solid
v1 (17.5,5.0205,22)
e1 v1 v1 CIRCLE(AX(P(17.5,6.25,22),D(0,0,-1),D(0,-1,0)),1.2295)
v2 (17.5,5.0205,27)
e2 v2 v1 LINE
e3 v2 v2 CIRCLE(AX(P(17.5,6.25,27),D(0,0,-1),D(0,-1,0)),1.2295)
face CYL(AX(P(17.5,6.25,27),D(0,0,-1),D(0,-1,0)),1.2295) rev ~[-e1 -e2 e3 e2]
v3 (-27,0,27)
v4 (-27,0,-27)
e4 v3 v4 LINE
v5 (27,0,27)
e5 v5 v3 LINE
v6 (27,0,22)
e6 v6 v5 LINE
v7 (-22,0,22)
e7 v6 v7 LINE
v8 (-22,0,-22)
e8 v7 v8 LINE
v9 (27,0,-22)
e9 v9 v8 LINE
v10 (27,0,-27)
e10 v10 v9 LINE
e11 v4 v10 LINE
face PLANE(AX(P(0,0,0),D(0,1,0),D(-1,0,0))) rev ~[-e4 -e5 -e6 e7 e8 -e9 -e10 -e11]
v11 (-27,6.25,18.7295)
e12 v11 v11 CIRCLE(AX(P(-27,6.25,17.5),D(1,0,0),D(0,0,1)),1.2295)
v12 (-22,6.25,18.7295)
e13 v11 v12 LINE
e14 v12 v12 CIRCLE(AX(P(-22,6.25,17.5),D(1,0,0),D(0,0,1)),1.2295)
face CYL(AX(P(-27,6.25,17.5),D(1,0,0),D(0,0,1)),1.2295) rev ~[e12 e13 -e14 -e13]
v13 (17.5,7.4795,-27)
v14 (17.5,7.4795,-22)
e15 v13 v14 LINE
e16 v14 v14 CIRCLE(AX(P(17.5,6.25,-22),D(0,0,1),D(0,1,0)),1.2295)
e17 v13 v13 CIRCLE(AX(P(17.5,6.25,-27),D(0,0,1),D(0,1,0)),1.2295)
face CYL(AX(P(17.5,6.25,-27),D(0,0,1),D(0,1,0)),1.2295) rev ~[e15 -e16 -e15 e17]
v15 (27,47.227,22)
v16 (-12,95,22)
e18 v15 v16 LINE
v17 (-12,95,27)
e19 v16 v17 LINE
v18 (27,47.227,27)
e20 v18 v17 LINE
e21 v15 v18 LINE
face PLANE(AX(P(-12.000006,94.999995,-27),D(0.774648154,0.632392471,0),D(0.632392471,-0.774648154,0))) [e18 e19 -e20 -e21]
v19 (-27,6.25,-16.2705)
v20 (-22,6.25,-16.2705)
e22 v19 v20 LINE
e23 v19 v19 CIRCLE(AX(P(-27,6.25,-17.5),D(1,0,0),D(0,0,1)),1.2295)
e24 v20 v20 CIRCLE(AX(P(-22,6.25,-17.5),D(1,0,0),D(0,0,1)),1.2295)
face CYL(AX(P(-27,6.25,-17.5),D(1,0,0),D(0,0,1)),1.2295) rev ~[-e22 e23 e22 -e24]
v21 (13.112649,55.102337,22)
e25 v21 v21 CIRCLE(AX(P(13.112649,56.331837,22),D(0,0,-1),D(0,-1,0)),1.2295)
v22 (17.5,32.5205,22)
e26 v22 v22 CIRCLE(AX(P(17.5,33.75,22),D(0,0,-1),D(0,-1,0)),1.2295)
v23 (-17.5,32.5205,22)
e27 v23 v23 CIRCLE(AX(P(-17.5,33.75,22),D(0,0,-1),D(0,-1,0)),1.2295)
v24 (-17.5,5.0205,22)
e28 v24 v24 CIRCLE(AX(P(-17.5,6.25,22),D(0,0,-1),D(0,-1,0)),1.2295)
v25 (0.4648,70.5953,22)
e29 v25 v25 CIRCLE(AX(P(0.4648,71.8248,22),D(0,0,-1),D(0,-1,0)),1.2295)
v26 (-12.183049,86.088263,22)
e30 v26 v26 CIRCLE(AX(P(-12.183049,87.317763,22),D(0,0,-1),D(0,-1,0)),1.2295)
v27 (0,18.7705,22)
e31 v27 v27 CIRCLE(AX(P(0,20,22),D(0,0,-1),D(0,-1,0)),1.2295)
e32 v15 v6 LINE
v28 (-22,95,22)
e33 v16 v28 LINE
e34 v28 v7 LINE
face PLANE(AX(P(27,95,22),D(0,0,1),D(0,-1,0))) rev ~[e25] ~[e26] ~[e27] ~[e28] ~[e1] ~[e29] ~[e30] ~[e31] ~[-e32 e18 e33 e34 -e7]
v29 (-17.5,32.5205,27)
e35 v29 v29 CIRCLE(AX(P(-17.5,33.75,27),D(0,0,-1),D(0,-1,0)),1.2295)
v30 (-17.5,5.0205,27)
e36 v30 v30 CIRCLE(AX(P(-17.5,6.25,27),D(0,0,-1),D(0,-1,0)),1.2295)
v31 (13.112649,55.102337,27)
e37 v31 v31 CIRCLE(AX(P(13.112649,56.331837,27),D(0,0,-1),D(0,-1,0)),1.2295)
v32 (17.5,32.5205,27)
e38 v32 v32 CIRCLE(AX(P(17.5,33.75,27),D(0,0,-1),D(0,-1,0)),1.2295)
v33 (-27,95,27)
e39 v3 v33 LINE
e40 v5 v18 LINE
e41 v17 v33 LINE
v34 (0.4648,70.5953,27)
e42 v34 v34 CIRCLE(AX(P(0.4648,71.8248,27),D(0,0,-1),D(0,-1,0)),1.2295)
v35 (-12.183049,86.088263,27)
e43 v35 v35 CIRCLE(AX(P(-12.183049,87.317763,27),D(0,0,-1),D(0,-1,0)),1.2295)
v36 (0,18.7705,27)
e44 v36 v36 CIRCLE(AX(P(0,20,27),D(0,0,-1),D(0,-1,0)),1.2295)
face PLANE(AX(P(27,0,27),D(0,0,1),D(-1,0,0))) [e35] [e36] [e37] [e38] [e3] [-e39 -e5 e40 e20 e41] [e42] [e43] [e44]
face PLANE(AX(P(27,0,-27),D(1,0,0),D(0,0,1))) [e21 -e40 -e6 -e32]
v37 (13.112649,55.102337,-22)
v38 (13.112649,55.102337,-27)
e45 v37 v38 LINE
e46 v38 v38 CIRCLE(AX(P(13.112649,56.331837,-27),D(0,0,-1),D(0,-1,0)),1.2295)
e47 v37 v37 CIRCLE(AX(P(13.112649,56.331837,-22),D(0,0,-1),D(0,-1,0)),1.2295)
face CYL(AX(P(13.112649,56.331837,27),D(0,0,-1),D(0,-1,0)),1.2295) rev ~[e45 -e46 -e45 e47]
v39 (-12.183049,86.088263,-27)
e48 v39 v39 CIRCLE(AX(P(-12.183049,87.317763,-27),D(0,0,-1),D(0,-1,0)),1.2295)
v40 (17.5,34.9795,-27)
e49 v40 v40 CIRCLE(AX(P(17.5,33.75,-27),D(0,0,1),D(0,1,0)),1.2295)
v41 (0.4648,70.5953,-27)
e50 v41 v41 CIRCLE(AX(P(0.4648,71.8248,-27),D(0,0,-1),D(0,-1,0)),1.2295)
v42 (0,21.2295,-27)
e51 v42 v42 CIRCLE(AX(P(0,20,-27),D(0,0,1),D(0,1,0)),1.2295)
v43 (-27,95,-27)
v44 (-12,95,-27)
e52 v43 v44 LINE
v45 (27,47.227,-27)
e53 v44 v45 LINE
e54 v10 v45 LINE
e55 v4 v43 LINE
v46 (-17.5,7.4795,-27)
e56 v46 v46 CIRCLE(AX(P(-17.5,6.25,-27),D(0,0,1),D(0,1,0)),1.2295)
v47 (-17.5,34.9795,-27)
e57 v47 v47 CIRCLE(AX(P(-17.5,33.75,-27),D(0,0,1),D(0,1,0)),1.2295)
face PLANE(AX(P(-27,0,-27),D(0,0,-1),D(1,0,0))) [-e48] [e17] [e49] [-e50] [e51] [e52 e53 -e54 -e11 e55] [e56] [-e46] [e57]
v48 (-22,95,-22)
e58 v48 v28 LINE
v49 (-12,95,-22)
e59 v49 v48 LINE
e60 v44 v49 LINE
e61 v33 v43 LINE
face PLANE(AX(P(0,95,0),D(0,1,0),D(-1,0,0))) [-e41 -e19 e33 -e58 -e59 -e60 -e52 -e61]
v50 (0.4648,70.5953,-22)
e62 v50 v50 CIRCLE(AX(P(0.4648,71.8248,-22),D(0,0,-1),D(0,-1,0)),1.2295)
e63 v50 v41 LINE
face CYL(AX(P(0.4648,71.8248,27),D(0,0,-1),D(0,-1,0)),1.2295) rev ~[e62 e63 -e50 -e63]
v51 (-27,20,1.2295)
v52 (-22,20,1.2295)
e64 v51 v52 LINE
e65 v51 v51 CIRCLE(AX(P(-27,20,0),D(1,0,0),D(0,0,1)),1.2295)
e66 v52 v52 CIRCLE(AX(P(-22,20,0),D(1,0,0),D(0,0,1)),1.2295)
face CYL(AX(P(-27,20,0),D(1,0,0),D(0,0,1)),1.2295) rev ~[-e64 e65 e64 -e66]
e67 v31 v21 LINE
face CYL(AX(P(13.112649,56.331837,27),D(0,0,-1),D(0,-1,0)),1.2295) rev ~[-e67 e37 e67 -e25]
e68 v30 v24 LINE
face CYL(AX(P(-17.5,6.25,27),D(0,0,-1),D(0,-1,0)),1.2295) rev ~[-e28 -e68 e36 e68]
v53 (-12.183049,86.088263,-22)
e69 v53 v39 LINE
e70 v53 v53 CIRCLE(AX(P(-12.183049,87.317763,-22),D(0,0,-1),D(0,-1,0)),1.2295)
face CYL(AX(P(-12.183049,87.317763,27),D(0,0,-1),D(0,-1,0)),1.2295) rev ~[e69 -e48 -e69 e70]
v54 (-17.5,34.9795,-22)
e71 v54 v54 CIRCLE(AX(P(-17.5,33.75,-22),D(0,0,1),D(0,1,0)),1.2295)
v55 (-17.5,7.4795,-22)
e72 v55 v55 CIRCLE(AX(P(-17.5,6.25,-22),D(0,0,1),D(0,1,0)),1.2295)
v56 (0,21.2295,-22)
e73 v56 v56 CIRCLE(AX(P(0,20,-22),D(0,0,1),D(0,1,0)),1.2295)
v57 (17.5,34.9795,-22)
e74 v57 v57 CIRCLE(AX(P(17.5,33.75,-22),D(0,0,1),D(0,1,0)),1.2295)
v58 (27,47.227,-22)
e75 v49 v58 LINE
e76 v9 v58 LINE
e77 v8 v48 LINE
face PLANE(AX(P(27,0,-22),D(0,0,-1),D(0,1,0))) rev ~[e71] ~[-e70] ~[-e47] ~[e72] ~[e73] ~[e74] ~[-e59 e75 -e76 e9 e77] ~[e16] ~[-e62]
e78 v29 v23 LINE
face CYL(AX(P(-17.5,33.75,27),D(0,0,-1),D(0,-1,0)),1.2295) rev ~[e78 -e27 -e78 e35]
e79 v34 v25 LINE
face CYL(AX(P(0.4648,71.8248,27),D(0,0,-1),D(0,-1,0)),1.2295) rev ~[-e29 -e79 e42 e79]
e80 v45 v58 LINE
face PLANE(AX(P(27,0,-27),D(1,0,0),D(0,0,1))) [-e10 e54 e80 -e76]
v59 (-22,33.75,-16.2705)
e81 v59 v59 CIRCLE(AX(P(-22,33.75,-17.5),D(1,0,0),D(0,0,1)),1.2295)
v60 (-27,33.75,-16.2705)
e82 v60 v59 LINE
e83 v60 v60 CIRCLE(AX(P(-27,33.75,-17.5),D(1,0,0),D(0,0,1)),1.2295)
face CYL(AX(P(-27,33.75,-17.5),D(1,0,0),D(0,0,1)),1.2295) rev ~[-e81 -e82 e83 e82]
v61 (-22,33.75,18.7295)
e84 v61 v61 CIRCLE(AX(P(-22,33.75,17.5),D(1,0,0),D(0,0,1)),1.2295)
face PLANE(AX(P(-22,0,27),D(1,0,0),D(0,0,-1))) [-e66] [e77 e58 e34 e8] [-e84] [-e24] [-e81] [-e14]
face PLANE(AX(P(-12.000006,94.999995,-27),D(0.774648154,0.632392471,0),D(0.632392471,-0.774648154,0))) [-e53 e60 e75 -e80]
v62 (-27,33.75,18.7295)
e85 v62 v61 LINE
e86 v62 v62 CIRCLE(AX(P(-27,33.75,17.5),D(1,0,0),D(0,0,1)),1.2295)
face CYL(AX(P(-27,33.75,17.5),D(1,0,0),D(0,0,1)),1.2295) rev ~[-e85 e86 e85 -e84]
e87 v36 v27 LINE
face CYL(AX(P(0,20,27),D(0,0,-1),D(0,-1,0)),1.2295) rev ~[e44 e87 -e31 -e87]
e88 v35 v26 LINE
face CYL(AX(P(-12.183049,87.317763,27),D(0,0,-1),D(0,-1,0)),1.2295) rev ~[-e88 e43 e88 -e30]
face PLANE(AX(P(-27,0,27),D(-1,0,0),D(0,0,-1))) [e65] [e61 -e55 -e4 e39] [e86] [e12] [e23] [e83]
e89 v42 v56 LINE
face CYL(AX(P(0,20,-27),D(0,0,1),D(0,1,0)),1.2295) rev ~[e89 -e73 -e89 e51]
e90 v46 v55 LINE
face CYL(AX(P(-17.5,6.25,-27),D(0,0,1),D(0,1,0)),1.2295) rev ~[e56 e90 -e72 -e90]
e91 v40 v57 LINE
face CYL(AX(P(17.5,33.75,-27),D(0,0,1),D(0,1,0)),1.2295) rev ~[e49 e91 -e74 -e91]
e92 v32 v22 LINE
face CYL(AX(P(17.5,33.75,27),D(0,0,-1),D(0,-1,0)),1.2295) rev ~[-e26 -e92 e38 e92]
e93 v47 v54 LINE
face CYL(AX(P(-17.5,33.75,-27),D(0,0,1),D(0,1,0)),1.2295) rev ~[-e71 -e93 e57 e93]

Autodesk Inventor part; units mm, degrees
ref_plane "YZ Plane" through (0, 0, 0) normal (1, 0, 0) x (0, 1, 0)
ref_plane "XZ Plane" through (0, 0, 0) normal (0, 1, 0) x (-1, 0, 0)
ref_plane "XY Plane" through (0, 0, 0) normal (0, 0, 1) x (1, 0, 0)
sketch "Skizze1" plane through (0, 0, 0) normal (0, 1, 0) x (-1, 0, 0)
  line L0 (-27, 27) -> (27, 27)
  line L1 (27, 27) -> (27, -27)
  line L2 (27, -27) -> (-27, -27)
  line L3 (-27, -27) -> (-27, 27)
  line L4 (-27, 27) -> (27, -27) construction
  line L5 (27, 27) -> (-27, -27) construction
  point P0 (0, 0)
  dimension "d0" = 54
  dimension "d1" = 54
extrude "Extrusion1" add sketch "Skizze1" along normal blind 95
sketch "Skizze2" plane through (27, 0, 27) normal (1, 0, 0) x (0, 0, -1)
  line L0 (5, 0) -> (49, 0)
  line L1 (49, 0) -> (49, 95)
  line L2 (49, 95) -> (5, 95)
  line L3 (5, 95) -> (5, 0)
  line L4 (0, 0) -> (0, 95) projected
  line L5 (54, 0) -> (54, 95) projected
  line L6 (54, 0) -> (0, 0) projected
  line L7 (54, 0) -> (54, 95) projected
  line L8 (0, 95) -> (54, 95) projected
  line L9 (0, 0) -> (0, 95) projected
  line L10 (0, 95) -> (54, 95) projected
  line L11 (54, 0) -> (0, 0) projected
  point P0 (27, 0)
  dimension "d4" = 5
  dimension "d5" = 5
extrude "Extrusion2" cut sketch "Skizze2" against normal blind 49 contours L3 L2 L1 L0
sketch "Skizze3" plane through (27, 0, -27) normal (0, 0, -1) x (-1, 0, 0)
  line L0 (54, 0) -> (0, 0) projected
  line L1 (54, 0) -> (54, 95) projected
  line L2 (0, 95) -> (54, 95) projected
  line L3 (0, 0) -> (0, 95) projected
  line L4 (61.4003, 122.4392) -> (0, 47.227)
  line L5 (0, 47.227) -> (39, 95)
  line L6 (39, 95) -> (33.5775, 99.4267) construction
  line L7 (33.5775, 99.4267) -> (-5.4225, 51.6538) construction
  line L8 (-5.4225, 51.6538) -> (0, 47.227) construction
  line L9 (31.8094, 54.61) -> (-25.1559, 101.1143) construction
  line L10 (27.9901, 92.5825) -> (-13.8409, 126.7317)
  line L11 (-13.8409, 126.7317) -> (-47.9901, 84.9007)
  line L12 (-47.9901, 84.9007) -> (-6.1591, 50.7515) construction
  line L13 (-6.1591, 50.7515) -> (27.9901, 92.5825) construction
  line L14 (27.9901, 92.5825) -> (-47.9901, 84.9007) construction
  line L15 (-13.8409, 126.7317) -> (-6.1591, 50.7515) construction
  line L16 (0, 95) -> (54, 95) projected
  point P0 (27, 0)
  point P1 (-10, 88.7416)
  point P2 (-10, 88.7416)
  dimension "d34" = 7
  dimension "d35" = 61.6706
  dimension "d36" = 25.8353
  dimension "d37" = 54
  dimension "d38" = 54
  dimension "d39" = 15
  dimension "d60" = 10
extrude "Extrusion3" cut sketch "Skizze3" against normal through all contours L3 L2 L4
sketch "Skizze4" plane through (27, 0, -27) normal (0, 0, -1) x (-1, 0, 0)
  line L0 (9.5, 6.25) -> (44.5, 6.25)
  line L1 (44.5, 6.25) -> (44.5, 33.75)
  line L2 (44.5, 33.75) -> (9.5, 33.75)
  line L3 (9.5, 33.75) -> (9.5, 6.25)
  line L4 (9.5, 6.25) -> (44.5, 33.75) construction
  line L5 (44.5, 6.25) -> (9.5, 33.75) construction
  line L6 (27, 0) -> (27, 60.1271) construction
  line L7 (54, 0) -> (0, 0) construction
  point P0 (27, 20)
  point P1 (27, 20)
  dimension "d11" = 35
  dimension "d12" = 27.5
  dimension "d62" = 20
hole "Bohrung1" at (17.5, 33.75, -27) at (-17.5, 33.75, -27) at (-17.5, 6.25, -27) at (0, 20, -27) at (17.5, 6.25, -27) direction (0, 0, 1) diameter 2.459 end up to surface thread size "M3x0.5" class "6H" standard "ISO Metric profile"
sketch "Skizze5" plane through (27, 47.227, -22) normal (0.7746482, 0.6323925, 0) x (0, 0, -1)
  line L0 (-49, 0) -> (-49, 61.6706) projected
  line L1 (-44, 0) -> (-49, 0) projected
  line L2 (-44, 61.6706) -> (-44, 0) projected
  line L3 (0, 61.6706) -> (5, 61.6706) projected
  line L4 (0, 0) -> (0, 61.6706) projected
  line L5 (5, 0) -> (0, 0) projected
  line L6 (5, 61.6706) -> (5, 0) projected
  line L7 (0, 61.6706) -> (5, 61.6706) projected
  line L8 (-49, 0) -> (-49, 61.6706) projected
  line L9 (-44, 0) -> (-49, 0) projected
  line L10 (-44, 61.6706) -> (-44, 0) projected
  line L11 (-49, 61.6706) -> (-44, 61.6706) projected
  line L12 (0, 0) -> (0, 61.6706) projected
  line L13 (5, 0) -> (0, 0) projected
  line L14 (5, 61.6706) -> (5, 0) projected
  line L15 (-49, 61.6706) -> (-44, 61.6706) projected
  point P0 (127.5861, 27)
  point P1 (-46.5, 55)
  point P2 (2.5, 55)
  dimension "d41" = 2.5
  dimension "d42" = 2.5
  dimension "d43" = 55
  dimension "d44" = 55
hole "Bohrung2" [suppressed]
pattern_linear "Rechteckige Anordnung1" [suppressed]
pattern_circular "Runde Anordnung1" count 3 over 180 about axis through (0, -10, 0) along (0, 1, 0) of "Bohrung1"
sketch "Skizze6" plane through (-27, 0, 27) normal (0, 0, 1) x (1, 0, 0)
  circle A0 centre (27, 20) radius 1.2295 projected
  circle A1 centre (9.5, 6.25) radius 1.2295 projected
  circle A2 centre (44.5, 6.25) radius 1.2295 projected
  circle A3 centre (9.5, 33.75) radius 1.2295 projected
  circle A4 centre (44.5, 33.75) radius 1.2295 projected
  line L0 (54, 47.227) -> (15, 95) projected
  line L1 (0, 95) -> (15, 95) projected
  line L2 (0, 0) -> (0, 95) projected
  line L3 (54, 0) -> (0, 0) projected
  line L4 (54, 0) -> (54, 47.227) projected
  line L5 (5, 95) -> (5, 0) construction
  line L6 (15, 95) -> (-19.3701, 66.9416) construction
  line L7 (54, 47.227) -> (15, 95) construction
  point P0 (27, 0)
  point P1 (27.4648, 71.8248)
  dimension "d48" = 5
  dimension "d49" = 25.8353
  dimension "d61" = 61.6706
hole "Bohrung3" at (0.4648, 71.8248, 27) direction (0, 0, -1) diameter 2.459 end through all thread size "M3x0.5" class "6H" standard "ISO Metric profile"
pattern_linear "Rechteckige Anordnung2" count 3 spacing 20 along (-0.6323925, 0.7746482, 0) of "Bohrung3" first direction both ways yes
properties part number "complex_cube" material "Aluminium 6061"
